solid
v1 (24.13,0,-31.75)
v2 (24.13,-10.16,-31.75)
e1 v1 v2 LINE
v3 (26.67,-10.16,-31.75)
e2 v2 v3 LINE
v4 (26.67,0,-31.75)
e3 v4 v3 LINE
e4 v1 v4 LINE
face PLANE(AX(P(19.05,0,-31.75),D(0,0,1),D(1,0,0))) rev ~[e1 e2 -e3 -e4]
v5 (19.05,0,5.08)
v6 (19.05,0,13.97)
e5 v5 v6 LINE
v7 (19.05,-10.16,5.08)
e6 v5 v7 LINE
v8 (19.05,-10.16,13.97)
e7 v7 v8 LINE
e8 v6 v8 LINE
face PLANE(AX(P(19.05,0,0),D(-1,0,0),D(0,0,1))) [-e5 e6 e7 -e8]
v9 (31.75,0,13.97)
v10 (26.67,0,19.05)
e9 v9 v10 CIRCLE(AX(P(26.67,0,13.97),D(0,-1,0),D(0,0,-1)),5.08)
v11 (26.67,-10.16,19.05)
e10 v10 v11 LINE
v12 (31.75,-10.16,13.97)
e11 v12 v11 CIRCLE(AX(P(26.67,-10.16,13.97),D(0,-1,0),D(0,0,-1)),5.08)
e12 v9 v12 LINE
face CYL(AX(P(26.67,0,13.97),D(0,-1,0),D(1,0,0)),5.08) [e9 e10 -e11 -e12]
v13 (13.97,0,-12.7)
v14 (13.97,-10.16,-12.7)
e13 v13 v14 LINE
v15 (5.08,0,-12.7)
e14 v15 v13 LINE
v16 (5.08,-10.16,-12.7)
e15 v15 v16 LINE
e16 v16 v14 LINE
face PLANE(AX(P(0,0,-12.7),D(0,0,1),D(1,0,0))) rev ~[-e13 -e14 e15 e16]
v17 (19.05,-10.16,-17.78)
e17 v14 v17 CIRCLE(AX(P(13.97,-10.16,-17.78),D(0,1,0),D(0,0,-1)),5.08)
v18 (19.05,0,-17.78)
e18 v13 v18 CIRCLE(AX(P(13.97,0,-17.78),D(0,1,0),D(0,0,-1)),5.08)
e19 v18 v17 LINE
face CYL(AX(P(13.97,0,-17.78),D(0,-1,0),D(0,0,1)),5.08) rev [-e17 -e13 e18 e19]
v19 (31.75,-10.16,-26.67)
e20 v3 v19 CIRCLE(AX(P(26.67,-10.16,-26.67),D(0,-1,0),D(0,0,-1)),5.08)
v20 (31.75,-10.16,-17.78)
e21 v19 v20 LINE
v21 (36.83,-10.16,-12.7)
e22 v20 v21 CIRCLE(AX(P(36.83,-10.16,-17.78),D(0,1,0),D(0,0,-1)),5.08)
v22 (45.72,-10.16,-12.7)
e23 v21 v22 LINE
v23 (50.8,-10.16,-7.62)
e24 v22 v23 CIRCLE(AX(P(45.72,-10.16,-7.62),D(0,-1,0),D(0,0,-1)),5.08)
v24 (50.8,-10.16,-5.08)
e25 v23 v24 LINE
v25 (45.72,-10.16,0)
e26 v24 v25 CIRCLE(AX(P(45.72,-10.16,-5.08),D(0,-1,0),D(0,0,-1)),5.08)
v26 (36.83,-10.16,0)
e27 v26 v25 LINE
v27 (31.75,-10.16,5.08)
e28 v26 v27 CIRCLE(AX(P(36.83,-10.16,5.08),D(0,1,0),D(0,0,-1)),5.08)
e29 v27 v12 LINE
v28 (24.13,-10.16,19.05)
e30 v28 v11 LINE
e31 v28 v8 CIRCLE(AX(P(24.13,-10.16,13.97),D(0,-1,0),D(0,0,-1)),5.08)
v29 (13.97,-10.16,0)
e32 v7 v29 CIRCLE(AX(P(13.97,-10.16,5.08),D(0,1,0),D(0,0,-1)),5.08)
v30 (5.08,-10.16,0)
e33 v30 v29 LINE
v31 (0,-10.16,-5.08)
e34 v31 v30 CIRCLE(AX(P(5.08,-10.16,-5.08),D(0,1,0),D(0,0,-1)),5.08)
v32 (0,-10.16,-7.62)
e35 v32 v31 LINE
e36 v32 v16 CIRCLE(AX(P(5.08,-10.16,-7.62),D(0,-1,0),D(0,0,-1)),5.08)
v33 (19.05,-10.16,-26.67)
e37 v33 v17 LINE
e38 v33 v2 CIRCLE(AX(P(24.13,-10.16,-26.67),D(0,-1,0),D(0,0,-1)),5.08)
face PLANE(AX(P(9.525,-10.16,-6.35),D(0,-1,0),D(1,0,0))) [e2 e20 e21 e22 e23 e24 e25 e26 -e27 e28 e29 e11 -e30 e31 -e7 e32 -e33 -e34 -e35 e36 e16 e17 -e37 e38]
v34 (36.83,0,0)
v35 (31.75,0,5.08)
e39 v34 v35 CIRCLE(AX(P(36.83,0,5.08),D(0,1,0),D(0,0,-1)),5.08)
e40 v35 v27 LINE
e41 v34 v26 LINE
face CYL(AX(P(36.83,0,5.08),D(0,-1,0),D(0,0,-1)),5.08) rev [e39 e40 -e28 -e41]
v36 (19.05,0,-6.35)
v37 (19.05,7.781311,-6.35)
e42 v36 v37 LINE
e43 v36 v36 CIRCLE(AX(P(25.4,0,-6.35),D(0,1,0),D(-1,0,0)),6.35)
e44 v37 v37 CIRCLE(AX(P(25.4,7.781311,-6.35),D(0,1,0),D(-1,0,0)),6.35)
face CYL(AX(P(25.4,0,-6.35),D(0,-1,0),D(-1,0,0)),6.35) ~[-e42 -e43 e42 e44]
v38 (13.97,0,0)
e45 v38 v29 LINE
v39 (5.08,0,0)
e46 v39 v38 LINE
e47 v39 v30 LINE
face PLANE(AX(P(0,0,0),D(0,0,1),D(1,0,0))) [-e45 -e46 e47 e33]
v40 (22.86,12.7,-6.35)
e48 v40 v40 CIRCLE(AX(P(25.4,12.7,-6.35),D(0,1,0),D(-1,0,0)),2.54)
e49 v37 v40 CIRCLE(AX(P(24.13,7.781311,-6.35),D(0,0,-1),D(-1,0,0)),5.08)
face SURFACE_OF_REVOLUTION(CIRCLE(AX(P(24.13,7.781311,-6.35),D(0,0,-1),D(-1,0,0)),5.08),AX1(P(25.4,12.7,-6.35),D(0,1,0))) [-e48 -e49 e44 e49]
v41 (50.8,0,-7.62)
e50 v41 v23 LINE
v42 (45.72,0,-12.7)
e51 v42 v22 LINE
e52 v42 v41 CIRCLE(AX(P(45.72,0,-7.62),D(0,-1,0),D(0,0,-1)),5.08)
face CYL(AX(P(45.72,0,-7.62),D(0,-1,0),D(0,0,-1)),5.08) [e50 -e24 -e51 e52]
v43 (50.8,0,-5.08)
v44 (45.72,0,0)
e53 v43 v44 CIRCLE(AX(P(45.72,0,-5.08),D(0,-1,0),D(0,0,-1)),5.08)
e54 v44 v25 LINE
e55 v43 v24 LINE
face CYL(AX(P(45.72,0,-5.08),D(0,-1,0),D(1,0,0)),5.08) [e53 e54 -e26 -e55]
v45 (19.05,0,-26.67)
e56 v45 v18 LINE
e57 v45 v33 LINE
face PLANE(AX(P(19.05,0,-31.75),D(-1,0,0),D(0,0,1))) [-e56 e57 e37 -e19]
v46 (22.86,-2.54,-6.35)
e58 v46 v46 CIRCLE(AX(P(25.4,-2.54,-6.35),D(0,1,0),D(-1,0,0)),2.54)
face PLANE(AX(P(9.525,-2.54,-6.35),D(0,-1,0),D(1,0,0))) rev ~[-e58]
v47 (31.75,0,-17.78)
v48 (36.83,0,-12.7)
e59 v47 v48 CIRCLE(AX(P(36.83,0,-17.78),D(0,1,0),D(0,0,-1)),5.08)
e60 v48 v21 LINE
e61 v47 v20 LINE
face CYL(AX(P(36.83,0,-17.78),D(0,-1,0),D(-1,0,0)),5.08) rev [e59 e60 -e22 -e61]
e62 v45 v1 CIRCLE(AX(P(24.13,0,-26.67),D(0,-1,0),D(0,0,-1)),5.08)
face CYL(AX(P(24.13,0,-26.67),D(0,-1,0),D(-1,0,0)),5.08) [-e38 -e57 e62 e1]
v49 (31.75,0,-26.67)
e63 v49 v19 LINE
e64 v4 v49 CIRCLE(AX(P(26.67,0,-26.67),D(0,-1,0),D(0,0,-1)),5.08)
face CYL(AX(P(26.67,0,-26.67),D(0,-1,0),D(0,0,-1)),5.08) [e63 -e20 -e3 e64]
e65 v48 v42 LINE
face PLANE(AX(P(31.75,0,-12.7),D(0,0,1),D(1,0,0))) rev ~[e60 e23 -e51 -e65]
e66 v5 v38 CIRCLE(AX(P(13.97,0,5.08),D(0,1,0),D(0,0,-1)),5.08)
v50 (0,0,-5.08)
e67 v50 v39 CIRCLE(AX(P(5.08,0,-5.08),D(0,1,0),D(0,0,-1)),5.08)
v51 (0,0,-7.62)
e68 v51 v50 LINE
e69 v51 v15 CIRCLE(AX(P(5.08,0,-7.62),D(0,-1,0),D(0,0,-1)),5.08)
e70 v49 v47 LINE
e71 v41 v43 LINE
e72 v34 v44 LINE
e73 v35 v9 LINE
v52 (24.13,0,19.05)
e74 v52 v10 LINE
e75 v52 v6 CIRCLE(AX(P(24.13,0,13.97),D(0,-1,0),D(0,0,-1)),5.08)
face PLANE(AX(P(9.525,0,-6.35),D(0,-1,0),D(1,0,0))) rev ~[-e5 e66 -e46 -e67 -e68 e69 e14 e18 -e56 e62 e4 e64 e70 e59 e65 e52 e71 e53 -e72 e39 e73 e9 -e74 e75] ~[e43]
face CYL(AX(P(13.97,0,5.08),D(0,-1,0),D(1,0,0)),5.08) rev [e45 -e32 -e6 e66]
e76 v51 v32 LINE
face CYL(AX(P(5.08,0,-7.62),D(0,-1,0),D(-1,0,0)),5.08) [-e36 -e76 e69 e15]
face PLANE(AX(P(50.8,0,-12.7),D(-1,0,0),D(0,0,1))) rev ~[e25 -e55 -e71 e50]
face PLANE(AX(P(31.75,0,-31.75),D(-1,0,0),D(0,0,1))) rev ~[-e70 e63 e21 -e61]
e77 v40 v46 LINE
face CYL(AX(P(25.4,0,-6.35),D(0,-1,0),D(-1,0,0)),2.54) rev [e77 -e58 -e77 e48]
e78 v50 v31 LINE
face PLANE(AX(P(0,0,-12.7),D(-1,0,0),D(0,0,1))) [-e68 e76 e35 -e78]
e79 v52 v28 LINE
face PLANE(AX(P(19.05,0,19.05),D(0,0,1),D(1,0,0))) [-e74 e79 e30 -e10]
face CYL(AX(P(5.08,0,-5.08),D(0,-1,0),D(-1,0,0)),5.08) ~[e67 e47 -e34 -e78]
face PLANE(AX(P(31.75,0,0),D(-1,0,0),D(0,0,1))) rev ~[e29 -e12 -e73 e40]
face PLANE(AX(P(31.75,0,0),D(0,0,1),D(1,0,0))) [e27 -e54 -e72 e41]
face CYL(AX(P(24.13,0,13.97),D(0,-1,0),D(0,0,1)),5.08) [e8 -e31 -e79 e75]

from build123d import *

# Parameters (mm, degrees)
F0_W     = 19.05
F0_H     = 12.7
F0_W_2   = 12.7
F0_H_2   = 19.05
F1_DEPTH = 10.16
F2_R     = 5.08
F3_R     = 6.35
F3_R_2   = 2.54
F4_DEPTH = 12.7
F5_DEPTH = 2.54


# Not quite as in the source:
# - a fillet or chamfer that OpenCascade refuses, or shapes differently, is made with other operations: its cross-section is extruded or revolved along the edge and cut away or added


with BuildPart() as f1:
    # F0 (on Front) → F1 (new body)
    with BuildSketch(Plane.XZ):
        with Locations((9.525, -6.35)):
            Rectangle(F0_W, F0_H)
        with Locations((25.4, 9.525)):
            Rectangle(F0_W_2, F0_H_2)
        with Locations((25.4, -6.35)):
            Rectangle(F0_W_2, F0_H)
        with Locations((41.275, -6.35)):
            Rectangle(F0_W, F0_H)
        with Locations((25.4, -22.225)):
            Rectangle(F0_W_2, F0_H_2)
    extrude(amount=F1_DEPTH)

    # F2
    f2_edges = [f1.edges().sort_by_distance(p)[0] for p in [
        (19.05, -5.08, -12.7),
        (19.05, -5.08, 0),
        (31.75, -5.08, 0),
        (31.75, -5.08, -12.7),
        (0, -5.08, 0),
        (0, -5.08, -12.7),
        (19.05, -5.08, -31.75),
        (31.75, -5.08, -31.75),
        (50.8, -5.08, -12.7),
        (50.8, -5.08, 0),
        (31.75, -5.08, 19.05),
        (19.05, -5.08, 19.05),
    ]]
    fillet(f2_edges, radius=F2_R)

    # F3 (on face) → F4 (join)
    with BuildSketch(Plane(origin=(0, 0, 0), x_dir=(-1, 0, 0), z_dir=(0, 1, 0))):
        with Locations((-25.4, -6.35)):
            Circle(F3_R)
        with Locations((-25.4, -6.35)):
            Circle(F3_R_2, mode=Mode.SUBTRACT)
    extrude(amount=F4_DEPTH)

    # F5 (cut): a face of the model
    f5_faces = [f1.faces().sort_by_distance(p)[0] for p in [
        (25.4, 0, -6.35),
    ]]
    extrude(f5_faces, amount=-F5_DEPTH, mode=Mode.SUBTRACT)

    # F6: fillet of radius 5.08 on 1 edges, made by hand

    # F6_s1 → F6_t2 (revolve, cut)
    with BuildSketch(Plane.XY.offset(-6.35)):
        with BuildLine():
            ThreePointArc((19.05, 7.7813111503), (20.1139073716, 10.8921631237), (22.86, 12.7))
            Line((22.86, 12.7), (19.05, 12.7))
            Line((19.05, 12.7), (19.05, 7.7813111503))
        make_face()
    revolve(axis=Axis((25.4, 12.7, -6.35), (0, 1, 0)), mode=Mode.SUBTRACT)


solid = f1.part
